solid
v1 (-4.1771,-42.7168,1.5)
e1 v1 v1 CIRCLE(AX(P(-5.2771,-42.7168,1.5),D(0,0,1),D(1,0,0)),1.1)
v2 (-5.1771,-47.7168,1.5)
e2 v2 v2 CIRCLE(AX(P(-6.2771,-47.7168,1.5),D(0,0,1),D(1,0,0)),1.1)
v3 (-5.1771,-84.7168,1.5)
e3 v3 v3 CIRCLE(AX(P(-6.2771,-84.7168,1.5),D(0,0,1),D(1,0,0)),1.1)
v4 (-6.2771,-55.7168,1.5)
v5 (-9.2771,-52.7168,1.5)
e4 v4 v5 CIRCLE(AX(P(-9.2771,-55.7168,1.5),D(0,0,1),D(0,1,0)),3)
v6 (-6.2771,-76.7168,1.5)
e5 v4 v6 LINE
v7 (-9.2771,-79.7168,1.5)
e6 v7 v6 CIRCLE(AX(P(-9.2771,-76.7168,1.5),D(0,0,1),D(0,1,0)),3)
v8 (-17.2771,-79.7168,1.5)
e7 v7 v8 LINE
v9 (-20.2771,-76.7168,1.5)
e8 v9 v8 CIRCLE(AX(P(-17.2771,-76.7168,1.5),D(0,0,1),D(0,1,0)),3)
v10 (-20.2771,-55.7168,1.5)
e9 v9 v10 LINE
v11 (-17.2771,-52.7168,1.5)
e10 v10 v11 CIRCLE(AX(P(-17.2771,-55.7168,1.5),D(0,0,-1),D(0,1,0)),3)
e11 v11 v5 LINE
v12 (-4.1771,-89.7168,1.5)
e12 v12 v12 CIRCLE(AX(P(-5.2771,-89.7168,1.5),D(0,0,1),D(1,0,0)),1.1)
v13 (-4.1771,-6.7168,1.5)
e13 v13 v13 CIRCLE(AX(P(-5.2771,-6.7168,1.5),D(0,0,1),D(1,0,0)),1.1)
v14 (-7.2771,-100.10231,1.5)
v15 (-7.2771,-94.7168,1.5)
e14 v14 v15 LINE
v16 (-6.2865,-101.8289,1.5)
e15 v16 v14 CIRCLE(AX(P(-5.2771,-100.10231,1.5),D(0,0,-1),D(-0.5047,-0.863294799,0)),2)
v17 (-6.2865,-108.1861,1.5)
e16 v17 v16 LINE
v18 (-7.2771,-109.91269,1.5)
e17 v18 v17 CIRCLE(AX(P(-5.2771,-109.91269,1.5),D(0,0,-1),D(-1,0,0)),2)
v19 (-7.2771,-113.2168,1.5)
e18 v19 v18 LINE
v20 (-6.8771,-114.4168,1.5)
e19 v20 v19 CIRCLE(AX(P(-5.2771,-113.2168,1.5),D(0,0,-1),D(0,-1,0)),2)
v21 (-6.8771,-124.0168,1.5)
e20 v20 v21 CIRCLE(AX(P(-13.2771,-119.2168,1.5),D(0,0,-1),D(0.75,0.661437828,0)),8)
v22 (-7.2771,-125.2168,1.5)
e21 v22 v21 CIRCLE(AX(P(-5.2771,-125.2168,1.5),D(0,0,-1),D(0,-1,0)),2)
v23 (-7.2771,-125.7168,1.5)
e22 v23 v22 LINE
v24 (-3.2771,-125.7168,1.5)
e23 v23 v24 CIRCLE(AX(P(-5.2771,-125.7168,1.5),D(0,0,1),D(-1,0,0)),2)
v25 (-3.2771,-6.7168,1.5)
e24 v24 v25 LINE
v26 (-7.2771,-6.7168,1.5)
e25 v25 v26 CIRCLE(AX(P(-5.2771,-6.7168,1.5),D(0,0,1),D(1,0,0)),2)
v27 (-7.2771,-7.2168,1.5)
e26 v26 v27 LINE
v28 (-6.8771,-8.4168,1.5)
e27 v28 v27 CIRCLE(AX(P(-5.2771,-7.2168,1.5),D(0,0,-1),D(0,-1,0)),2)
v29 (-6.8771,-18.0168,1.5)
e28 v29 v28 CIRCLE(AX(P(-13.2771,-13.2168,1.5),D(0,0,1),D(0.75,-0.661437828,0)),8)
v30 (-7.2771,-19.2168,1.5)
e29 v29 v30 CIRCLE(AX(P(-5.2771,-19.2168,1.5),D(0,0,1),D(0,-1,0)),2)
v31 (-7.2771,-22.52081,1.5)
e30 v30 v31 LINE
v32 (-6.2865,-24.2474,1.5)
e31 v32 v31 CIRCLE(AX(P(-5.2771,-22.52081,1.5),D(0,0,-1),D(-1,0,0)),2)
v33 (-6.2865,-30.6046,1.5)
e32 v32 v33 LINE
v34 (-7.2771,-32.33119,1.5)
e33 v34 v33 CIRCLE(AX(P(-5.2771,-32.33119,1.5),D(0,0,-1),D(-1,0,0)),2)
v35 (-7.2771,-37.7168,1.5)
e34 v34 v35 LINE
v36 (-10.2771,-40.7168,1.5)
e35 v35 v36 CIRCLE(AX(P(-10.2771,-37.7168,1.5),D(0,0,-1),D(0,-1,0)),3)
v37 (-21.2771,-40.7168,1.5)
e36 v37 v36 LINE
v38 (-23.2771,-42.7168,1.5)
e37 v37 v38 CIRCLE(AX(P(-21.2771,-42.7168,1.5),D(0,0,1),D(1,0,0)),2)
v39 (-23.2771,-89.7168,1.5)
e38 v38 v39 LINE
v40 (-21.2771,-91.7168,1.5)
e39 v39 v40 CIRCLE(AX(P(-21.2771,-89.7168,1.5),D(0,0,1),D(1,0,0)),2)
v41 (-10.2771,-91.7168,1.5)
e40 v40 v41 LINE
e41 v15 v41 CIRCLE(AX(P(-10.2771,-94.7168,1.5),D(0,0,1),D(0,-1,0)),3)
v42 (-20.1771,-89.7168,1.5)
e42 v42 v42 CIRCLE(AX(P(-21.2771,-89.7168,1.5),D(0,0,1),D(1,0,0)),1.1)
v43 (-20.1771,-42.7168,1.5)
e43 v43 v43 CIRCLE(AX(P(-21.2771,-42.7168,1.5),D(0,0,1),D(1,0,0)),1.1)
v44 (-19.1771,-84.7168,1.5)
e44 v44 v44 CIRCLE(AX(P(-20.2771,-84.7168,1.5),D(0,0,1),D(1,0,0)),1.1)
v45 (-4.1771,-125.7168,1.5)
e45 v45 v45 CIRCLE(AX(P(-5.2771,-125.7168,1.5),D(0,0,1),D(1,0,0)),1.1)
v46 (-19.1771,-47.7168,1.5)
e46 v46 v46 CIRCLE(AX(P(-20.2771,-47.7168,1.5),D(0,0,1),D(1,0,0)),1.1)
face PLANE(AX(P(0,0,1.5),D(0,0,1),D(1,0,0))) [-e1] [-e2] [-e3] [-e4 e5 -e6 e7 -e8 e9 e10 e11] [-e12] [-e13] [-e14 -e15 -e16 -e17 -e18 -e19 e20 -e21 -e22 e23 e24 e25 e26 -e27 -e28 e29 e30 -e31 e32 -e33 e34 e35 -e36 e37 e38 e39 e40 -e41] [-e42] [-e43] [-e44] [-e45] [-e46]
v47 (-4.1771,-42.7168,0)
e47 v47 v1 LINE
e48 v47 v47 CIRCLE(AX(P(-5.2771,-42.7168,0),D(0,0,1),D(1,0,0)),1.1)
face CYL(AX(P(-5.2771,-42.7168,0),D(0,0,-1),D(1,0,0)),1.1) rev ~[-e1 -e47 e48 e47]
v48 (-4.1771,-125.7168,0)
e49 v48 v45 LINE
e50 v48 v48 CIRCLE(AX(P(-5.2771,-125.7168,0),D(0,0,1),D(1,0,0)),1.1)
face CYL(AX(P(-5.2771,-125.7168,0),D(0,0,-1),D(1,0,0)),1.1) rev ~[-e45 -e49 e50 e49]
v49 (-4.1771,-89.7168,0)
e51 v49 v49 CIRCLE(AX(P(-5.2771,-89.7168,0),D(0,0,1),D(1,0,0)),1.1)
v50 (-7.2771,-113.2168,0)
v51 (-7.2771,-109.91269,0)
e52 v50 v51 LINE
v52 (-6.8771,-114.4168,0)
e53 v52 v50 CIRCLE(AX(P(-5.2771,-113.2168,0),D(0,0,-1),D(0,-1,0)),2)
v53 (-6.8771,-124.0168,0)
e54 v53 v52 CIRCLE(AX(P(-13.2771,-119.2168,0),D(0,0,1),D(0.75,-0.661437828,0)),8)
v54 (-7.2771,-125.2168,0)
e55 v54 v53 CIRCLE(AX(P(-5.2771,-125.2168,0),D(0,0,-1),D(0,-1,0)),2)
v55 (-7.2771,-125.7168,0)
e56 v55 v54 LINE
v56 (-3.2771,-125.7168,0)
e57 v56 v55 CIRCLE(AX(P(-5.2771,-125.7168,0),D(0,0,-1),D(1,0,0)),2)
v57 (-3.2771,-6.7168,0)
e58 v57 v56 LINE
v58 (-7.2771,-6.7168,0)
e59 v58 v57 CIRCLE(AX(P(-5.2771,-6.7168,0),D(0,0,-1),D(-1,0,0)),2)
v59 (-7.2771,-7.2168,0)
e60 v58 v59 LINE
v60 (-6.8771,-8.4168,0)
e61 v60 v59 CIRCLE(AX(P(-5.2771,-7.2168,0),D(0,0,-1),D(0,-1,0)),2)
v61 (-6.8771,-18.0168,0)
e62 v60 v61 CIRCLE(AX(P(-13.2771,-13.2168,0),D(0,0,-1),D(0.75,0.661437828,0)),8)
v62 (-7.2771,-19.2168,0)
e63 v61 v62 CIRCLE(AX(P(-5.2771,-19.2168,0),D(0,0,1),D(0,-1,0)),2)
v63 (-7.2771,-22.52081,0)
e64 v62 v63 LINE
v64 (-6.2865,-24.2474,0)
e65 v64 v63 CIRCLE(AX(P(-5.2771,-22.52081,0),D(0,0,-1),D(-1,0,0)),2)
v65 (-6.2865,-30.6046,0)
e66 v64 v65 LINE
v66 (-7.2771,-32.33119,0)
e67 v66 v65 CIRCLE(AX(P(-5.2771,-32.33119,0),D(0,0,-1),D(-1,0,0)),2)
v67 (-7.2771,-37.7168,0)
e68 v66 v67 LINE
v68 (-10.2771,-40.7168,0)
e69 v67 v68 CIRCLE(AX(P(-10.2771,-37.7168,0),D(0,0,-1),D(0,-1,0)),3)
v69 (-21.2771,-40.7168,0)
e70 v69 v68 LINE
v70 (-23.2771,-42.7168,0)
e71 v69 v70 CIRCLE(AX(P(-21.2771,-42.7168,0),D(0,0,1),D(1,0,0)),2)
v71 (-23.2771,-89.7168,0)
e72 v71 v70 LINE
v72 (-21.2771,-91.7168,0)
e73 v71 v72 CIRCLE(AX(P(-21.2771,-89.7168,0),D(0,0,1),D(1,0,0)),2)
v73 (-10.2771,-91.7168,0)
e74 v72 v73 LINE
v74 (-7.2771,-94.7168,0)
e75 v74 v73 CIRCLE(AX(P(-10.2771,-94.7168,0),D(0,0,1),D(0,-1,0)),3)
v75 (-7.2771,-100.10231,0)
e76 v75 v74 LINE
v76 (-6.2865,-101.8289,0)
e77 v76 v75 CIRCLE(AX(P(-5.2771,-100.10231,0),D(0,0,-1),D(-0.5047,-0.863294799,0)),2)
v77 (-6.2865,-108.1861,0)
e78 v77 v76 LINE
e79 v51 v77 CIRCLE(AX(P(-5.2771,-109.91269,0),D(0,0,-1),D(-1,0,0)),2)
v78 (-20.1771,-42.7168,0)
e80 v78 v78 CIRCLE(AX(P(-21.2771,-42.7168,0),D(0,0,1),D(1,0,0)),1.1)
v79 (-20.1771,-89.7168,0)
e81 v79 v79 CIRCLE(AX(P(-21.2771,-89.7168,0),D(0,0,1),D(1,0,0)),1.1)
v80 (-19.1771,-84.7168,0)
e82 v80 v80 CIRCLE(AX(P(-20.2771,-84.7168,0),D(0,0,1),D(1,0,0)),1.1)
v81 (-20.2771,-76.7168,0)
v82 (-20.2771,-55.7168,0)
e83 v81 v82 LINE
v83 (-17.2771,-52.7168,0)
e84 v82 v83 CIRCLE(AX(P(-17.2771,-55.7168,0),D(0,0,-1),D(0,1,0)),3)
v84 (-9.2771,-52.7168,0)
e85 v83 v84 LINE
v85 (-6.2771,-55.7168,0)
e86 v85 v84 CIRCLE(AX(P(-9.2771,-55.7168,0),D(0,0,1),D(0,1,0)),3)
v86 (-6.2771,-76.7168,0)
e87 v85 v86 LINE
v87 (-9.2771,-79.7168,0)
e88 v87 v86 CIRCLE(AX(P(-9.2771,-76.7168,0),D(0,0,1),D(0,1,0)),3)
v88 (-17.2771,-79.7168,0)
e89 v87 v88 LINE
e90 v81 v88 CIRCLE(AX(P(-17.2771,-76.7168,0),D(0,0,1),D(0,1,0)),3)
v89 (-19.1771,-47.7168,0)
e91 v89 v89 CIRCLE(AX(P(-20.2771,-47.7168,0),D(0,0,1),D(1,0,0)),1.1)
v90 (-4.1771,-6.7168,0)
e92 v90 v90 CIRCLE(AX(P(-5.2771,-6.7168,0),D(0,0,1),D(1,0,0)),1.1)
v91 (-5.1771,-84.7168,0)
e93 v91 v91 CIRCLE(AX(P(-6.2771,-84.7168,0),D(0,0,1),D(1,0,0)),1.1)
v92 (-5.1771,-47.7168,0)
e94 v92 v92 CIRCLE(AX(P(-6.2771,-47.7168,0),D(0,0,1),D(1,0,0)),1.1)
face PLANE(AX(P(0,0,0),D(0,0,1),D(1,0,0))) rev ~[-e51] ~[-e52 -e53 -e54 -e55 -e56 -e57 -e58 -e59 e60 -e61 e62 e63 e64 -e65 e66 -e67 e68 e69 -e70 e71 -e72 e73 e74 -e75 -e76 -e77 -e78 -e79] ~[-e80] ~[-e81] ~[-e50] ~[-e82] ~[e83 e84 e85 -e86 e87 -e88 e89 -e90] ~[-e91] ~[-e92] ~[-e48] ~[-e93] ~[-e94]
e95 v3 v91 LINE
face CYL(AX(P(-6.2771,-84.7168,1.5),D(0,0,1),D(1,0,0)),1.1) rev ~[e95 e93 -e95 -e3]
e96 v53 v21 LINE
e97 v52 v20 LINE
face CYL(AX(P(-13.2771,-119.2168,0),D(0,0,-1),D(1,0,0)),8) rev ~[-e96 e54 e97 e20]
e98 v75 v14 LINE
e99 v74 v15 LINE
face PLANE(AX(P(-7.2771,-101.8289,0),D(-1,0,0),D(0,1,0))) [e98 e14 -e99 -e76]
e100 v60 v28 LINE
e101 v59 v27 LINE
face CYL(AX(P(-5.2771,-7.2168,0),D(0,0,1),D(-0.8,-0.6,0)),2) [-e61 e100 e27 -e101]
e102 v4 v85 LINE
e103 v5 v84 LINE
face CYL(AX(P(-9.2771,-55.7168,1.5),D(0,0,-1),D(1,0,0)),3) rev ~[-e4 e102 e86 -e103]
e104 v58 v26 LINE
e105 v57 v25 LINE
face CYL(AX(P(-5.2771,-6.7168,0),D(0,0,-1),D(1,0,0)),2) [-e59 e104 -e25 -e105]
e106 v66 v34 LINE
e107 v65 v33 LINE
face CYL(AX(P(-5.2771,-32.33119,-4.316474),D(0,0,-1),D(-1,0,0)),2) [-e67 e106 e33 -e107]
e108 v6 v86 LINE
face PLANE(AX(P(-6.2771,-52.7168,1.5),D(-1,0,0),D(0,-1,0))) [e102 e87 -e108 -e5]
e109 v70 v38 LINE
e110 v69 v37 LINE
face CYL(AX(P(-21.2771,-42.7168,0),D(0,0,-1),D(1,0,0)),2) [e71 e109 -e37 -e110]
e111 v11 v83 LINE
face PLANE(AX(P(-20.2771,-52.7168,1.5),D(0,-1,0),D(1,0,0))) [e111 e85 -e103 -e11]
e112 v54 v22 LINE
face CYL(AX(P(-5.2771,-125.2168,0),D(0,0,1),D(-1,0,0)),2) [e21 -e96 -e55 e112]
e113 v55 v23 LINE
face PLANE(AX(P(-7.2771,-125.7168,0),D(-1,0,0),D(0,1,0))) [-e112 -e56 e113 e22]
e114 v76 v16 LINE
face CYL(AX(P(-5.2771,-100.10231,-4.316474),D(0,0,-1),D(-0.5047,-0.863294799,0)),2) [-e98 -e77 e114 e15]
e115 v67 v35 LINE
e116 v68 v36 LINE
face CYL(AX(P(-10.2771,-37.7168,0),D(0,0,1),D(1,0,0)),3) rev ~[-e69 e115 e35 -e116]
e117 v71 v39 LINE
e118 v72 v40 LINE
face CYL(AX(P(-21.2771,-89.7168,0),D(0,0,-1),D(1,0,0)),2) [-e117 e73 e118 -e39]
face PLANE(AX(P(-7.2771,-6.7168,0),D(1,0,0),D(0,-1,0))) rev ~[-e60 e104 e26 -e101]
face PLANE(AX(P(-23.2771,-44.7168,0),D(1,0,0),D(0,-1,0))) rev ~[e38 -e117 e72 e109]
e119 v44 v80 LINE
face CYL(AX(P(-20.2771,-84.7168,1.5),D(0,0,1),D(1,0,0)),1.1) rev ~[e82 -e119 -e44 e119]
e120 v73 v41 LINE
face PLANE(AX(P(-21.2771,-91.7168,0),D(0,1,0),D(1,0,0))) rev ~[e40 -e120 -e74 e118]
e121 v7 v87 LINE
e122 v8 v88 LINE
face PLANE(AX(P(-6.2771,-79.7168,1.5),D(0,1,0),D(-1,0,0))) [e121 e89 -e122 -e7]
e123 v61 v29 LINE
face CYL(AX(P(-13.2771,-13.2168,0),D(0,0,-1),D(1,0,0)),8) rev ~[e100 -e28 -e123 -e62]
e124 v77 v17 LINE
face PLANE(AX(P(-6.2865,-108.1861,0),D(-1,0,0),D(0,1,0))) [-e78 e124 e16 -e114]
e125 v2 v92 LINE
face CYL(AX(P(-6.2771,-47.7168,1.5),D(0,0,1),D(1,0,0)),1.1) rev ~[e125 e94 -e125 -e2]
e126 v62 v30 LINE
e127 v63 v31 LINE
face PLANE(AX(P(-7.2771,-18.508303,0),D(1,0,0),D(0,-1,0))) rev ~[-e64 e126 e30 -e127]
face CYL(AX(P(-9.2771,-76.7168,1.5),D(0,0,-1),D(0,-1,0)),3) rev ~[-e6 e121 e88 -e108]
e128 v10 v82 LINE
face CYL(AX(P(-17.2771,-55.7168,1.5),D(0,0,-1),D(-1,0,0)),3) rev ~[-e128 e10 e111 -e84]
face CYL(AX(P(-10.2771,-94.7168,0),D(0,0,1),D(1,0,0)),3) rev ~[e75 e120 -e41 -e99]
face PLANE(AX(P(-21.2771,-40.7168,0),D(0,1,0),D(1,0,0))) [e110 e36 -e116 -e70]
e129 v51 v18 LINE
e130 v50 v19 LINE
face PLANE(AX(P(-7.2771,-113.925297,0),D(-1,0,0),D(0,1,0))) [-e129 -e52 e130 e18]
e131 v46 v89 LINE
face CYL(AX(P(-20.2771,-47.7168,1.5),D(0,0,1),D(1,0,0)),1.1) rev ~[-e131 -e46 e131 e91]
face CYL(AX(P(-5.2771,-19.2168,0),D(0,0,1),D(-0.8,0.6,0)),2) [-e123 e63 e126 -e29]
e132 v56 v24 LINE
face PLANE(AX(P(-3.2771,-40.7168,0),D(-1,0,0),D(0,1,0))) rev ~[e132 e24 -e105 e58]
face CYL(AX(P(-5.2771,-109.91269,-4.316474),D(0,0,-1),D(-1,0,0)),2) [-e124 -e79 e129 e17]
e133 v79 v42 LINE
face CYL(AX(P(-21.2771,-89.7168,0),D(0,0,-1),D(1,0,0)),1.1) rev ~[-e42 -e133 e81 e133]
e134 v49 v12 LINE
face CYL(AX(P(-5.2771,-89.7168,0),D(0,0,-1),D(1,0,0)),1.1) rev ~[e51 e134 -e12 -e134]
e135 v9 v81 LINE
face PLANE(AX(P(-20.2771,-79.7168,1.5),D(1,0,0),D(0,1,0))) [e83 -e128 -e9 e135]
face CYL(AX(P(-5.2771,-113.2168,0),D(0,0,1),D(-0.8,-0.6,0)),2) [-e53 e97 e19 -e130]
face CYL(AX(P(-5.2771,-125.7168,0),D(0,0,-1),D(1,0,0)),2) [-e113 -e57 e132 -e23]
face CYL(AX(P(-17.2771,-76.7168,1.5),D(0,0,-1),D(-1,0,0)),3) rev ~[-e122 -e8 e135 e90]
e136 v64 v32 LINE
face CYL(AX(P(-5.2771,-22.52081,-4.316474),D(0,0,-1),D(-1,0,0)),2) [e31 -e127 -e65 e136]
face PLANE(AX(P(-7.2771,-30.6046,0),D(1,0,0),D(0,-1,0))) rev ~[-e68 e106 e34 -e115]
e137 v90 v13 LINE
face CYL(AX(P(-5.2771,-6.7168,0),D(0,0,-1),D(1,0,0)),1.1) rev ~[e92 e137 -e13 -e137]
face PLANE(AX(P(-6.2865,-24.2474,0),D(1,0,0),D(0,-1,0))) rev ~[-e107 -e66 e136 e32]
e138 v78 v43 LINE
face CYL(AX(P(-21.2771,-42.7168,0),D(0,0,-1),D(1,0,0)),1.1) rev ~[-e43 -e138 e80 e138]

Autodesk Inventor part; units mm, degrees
ref_plane "YZ Plane" through (0, 0, 0) normal (1, 0, 0) x (0, 1, 0)
ref_plane "XZ Plane" through (0, 0, 0) normal (0, 1, 0) x (-1, 0, 0)
ref_plane "XY Plane" through (0, 0, 0) normal (0, 0, 1) x (1, 0, 0)
sketch "スケッチ1" plane through (0, 0, 0) normal (0, 0, 1) x (1, 0, 0)
  circle A0 centre (-5.2771, -42.7168) radius 0.85 projected
  circle A1 centre (-21.2771, -42.7168) radius 0.85 projected
  circle A2 centre (-5.2771, -6.7168) radius 0.85 projected
  circle A3 centre (-13.2771, -13.2168) radius 8 projected
  line L0 (-3.2771, -4.7168) -> (-7.2771, -4.7168)
  line L1 (-7.2771, -4.7168) -> (-7.2771, -44.7168)
  line L2 (-7.2771, -44.7168) -> (-3.2771, -44.7168)
  line L3 (-3.2771, -44.7168) -> (-3.2771, -4.7168)
  line L4 (-3.2771, -44.7168) -> (-23.2771, -44.7168)
  line L5 (-23.2771, -44.7168) -> (-23.2771, -40.7168)
  line L6 (-23.2771, -40.7168) -> (-3.2771, -40.7168)
  line L7 (-3.2771, -40.7168) -> (-3.2771, -44.7168)
  circle A4 centre (-5.2771, -6.7168) radius 2
  circle A5 centre (-21.2771, -42.7168) radius 2
  circle A6 centre (-5.2771, -6.7168) radius 1.1
  circle A7 centre (-5.2771, -42.7168) radius 1.1
  circle A8 centre (-21.2771, -42.7168) radius 1.1
  line L8 (-5.2771, -66.2168) -> (-21.2771, -66.2168) construction
  circle A9 centre (-5.2771, -89.7168) radius 0.85
  circle A10 centre (-21.2771, -89.7168) radius 0.85
  circle A11 centre (-5.2771, -125.7168) radius 0.85
  circle A12 centre (-13.2771, -119.2168) radius 8
  line L9 (-3.2771, -127.7168) -> (-7.2771, -127.7168)
  line L10 (-7.2771, -127.7168) -> (-7.2771, -87.7168)
  line L11 (-7.2771, -87.7168) -> (-3.2771, -87.7168)
  line L12 (-3.2771, -87.7168) -> (-3.2771, -127.7168)
  line L13 (-3.2771, -87.7168) -> (-23.2771, -87.7168)
  line L14 (-23.2771, -87.7168) -> (-23.2771, -91.7168)
  line L15 (-23.2771, -91.7168) -> (-3.2771, -91.7168)
  line L16 (-3.2771, -91.7168) -> (-3.2771, -87.7168)
  circle A13 centre (-5.2771, -125.7168) radius 2
  circle A14 centre (-21.2771, -89.7168) radius 2
  circle A15 centre (-5.2771, -125.7168) radius 1.1
  circle A16 centre (-5.2771, -89.7168) radius 1.1
  circle A17 centre (-21.2771, -89.7168) radius 1.1
  line L17 (-3.2771, -44.7168) -> (-3.2771, -87.7168)
  line L18 (-23.2771, -44.7168) -> (-23.2771, -87.7168)
  line L19 (-6.4151, -24.526) -> (-6.4151, -30.526)
  line L20 (-6.2865, -24.2474) -> (-6.2865, -30.6046)
  line L21 (-6.2865, -30.6046) -> (-10.1437, -30.6046)
  line L22 (-10.1437, -24.2474) -> (-6.2865, -24.2474)
  line L23 (-6.4151, -107.9075) -> (-6.4151, -101.9075)
  line L24 (-6.2865, -108.1861) -> (-6.2865, -101.8289)
  line L25 (-6.2865, -101.8289) -> (-10.1437, -101.8289)
  line L26 (-10.1437, -108.1861) -> (-6.2865, -108.1861)
  line L27 (7.0429, 25.428) -> (7.0429, 23.728)
  point P0 (0, 0)
  point P1 (-3.2771, -42.7168)
  point P2 (-5.2771, -4.7168)
  point P3 (-13.2771, -44.7168)
  point P4 (-13.2771, -66.2168)
  point P5 (-3.2771, -89.7168)
  point P6 (-5.2771, -127.7168)
  point P7 (-13.2771, -87.7168)
  point P8 (-7.2771, -6.7168)
  point P9 (-7.2771, -7.9253)
  point P10 (-7.2771, -18.5083)
  point P11 (-7.2771, -40.7168)
  point P12 (-21.2771, -40.7168)
  point P13 (-23.2771, -42.7168)
  point P14 (-23.2771, -89.7168)
  point P15 (-21.2771, -91.7168)
  point P16 (-7.2771, -91.7168)
  point P17 (-7.2771, -113.9253)
  point P18 (-7.2771, -124.5083)
  point P19 (-7.2771, -125.7168)
  point P20 (-3.2771, -125.7168)
  point P21 (-3.2771, -6.7168)
  point P22 (-7.2771, -24.2474)
  point P23 (-7.2771, -30.6046)
  point P24 (-7.2771, -101.8289)
  point P25 (-7.2771, -108.1861)
  point P26 (7.0429, 24.578)
  dimension "d0" = 4
  dimension "d1" = 4
  dimension "d2" = 2.2
  dimension "d3" = 2.2
  dimension "d4" = 2.2
  dimension "d11" = 53
extrude "押し出し1" add sketch "スケッチ1" along normal blind 1.5 contours A3 L1 A4 L3 L6 L21 L20 L22 | A4 | L3 L2 L1 L6 | L1 L4 A5 L6 | L17 L11 L13 L18 L4 L2 | A5 | L12 L15 L10 L11 | L4 L5 A5 | L10 L15 A14 L13 | L12 A13 L10 A12 L26 L24 L25 L15 | A14 L14 L13 | A14 | A13
fillet "フィレット1" radius 2 4 edges at (-7.2771, -108.1861, 0.75) (-7.2771, -101.8289, 0.75) (-7.2771, -24.2474, 0.75) (-7.2771, -30.6046, 0.75)
fillet "フィレット2" radius 2 4 edges at (-7.2771, -18.5083, 0.75) (-7.2771, -7.9253, 0.75) (-7.2771, -124.5083, 0.75) (-7.2771, -113.9253, 0.75)
fillet "フィレット3" radius 3 2 edges at (-7.2771, -91.7168, 0.75) (-7.2771, -40.7168, 0.75)
sketch "スケッチ2" plane through (0, 0, 1.5) normal (0, 0, 1) x (1, 0, 0)
  circle A0 centre (-6.2771, -47.7168) radius 1.1
  line L0 (-3.2771, -125.7168) -> (-3.2771, -6.7168) projected
  circle A1 centre (-5.2771, -42.7168) radius 1.1 projected
  circle A2 centre (-20.2771, -47.7168) radius 1.1
  line L1 (-23.2771, -42.7168) -> (-23.2771, -89.7168) projected
  line L2 (-3.2771, -66.2168) -> (-23.2771, -66.2168) construction
  circle A3 centre (-6.2771, -84.7168) radius 1.1
  circle A4 centre (-20.2771, -84.7168) radius 1.1
  line L3 (-20.2771, -52.7168) -> (-6.2771, -52.7168)
  line L4 (-6.2771, -52.7168) -> (-6.2771, -79.7168)
  line L5 (-6.2771, -79.7168) -> (-20.2771, -79.7168)
  line L6 (-20.2771, -79.7168) -> (-20.2771, -52.7168)
  line L7 (-20.2771, -52.7168) -> (-6.2771, -79.7168) construction
  line L8 (-6.2771, -52.7168) -> (-20.2771, -79.7168) construction
  point P0 (0, 0)
  point P1 (-13.2771, -66.2168)
  dimension "d12" = 2.2
  dimension "d13" = 3
  dimension "d14" = 5
  dimension "d15" = 2.2
  dimension "d16" = 3
  dimension "d17" = 5
  dimension "d18" = 3
extrude "押し出し2" cut sketch "スケッチ2" against normal blind 1.5 contours A0 | A2 | A3 | A4 | L3 L4 L5 L6
fillet "フィレット4" radius 3 4 edges at (-20.2771, -52.7168, 0.75) (-6.2771, -52.7168, 0.75) (-20.2771, -79.7168, 0.75) (-6.2771, -79.7168, 0.75)
equation "\"d16\" = d13"
properties part number "new_ude" material "アルミニウム 2014-T4"
